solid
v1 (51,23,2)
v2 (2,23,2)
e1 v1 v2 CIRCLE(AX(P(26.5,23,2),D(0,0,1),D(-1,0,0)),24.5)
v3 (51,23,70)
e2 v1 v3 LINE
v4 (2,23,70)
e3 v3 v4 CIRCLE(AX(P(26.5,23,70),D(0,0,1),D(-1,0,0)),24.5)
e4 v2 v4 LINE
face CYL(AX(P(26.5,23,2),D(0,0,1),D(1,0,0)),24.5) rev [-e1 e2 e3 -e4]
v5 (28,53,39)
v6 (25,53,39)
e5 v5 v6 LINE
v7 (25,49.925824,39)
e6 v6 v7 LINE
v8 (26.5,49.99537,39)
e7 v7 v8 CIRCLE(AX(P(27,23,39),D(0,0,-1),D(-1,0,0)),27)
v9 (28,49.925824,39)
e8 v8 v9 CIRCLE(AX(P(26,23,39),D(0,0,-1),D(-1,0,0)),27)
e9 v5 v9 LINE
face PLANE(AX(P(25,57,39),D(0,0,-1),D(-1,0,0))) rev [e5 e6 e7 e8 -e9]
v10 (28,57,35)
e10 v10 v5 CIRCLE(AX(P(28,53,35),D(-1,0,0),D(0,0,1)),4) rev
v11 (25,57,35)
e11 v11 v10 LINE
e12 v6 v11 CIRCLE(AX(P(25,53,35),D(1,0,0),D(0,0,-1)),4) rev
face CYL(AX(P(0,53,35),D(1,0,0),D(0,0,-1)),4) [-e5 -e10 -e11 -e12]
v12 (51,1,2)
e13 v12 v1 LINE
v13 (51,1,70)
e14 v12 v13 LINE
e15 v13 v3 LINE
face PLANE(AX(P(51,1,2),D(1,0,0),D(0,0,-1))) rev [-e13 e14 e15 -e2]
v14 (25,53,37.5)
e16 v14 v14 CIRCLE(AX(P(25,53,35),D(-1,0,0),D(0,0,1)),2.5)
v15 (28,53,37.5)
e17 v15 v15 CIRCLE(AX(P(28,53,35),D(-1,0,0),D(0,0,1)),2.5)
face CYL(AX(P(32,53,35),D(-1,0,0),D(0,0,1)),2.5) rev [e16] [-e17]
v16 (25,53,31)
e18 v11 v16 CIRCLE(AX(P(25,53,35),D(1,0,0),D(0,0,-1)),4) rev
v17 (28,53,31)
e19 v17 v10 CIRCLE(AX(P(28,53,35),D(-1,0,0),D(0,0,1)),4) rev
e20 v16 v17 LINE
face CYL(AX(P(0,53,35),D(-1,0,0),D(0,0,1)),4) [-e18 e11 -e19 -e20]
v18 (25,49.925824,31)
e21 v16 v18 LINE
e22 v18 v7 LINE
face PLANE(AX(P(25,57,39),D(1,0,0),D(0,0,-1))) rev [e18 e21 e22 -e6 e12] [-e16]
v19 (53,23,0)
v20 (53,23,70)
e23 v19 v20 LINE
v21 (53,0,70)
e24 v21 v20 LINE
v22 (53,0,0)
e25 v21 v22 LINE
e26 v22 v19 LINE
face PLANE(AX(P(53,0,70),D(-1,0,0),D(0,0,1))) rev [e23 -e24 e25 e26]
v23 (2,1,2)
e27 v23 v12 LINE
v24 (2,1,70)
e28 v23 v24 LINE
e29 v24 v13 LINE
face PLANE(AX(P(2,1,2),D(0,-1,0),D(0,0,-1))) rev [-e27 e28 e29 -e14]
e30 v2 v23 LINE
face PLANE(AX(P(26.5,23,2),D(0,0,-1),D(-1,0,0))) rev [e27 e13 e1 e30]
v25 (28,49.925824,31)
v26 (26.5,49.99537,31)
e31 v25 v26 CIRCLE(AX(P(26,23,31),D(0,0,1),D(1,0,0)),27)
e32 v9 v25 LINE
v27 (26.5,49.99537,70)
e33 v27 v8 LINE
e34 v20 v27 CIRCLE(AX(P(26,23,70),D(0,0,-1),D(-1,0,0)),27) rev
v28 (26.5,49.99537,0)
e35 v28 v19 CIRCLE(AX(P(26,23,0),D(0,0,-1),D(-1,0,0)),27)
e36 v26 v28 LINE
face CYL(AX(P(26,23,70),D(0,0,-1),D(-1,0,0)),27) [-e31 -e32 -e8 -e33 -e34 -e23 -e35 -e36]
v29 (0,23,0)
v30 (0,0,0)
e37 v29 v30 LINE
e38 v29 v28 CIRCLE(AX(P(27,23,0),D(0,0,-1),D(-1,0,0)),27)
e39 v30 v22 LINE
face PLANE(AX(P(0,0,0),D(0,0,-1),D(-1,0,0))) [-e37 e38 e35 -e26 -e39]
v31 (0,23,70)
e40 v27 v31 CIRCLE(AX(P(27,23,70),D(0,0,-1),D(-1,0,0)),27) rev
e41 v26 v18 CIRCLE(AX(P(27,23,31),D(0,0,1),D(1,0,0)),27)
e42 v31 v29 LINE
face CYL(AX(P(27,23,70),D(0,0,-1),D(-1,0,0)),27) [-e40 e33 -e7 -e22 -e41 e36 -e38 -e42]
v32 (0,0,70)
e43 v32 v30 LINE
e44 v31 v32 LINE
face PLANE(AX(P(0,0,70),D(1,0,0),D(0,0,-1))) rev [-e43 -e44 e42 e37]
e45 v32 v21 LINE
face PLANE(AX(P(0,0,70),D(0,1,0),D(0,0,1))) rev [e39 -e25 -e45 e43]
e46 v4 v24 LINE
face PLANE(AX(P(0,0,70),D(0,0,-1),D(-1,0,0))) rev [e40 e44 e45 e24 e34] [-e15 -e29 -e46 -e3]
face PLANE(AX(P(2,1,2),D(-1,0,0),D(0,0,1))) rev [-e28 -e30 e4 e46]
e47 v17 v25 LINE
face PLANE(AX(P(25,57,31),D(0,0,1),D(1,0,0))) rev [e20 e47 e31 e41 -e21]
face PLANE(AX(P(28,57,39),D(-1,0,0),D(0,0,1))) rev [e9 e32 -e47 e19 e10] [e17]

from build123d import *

# Parameters (mm, degrees)
ESQUISSE1_W             = 53
ESQUISSE1_H             = 50
BOSS_EXTRU_1_DEPTH      = 70
ESQUISSE5_W             = 3
ESQUISSE5_H             = 8
BOSS_EXTRU_2_DEPTH      = 7
CONG_1_R                = 4
CONG_2_R                = 27
ESQUISSE8_R             = 2.5
ENL_V_MAT_EXTRU_3_DEPTH = 7
ENL_V_MAT_EXTRU_4_DEPTH = 68


# Some blends are built 0.0001 mm under size
with BuildPart() as part:
    # Esquisse1 → Boss.-Extru.1 (new body)
    with BuildSketch(Plane.XY):
        with Locations((26.5, 25)):
            Rectangle(ESQUISSE1_W, ESQUISSE1_H)
    extrude(amount=BOSS_EXTRU_1_DEPTH)

    # Esquisse5 → Boss.-Extru.2 (add)
    with BuildSketch(Plane(origin=(0, 50, 0), x_dir=(1, 0, 0), z_dir=(0, 1, 0))):
        with Locations((26.5, -35)):
            Rectangle(ESQUISSE5_W, ESQUISSE5_H)
    extrude(amount=BOSS_EXTRU_2_DEPTH)

    # Congé1
    cong_1_edges = [part.edges().sort_by_distance(p)[0] for p in [
        (26.5, 57, 31),
        (26.5, 57, 39),
    ]]
    fillet(cong_1_edges, radius=CONG_1_R - 0.0001)  # a hair under: the kernel refuses the full size

    # Congé2
    # the kernel refuses this fillet: 27 mm, written as the material it takes off along each edge
    with BuildSketch(Plane(origin=(0, 50, -67.5), x_dir=(1, 0, 0), z_dir=(0, 0, 1))) as cong_2_piece_1_section:
        with BuildLine():
            CenterArc((CONG_2_R, -CONG_2_R), CONG_2_R, 90, 90)
            Line((0, -CONG_2_R), (0, 0))
            Line((0, 0), (CONG_2_R, 0))
        make_face()
    cong_2_piece_1 = extrude(amount=205, mode=Mode.PRIVATE)
    cong_2_piece_1 = split(cong_2_piece_1, bisect_by=Plane(origin=(25, 50.257211281, -18.25), z_dir=(1, 0, 0)), keep=Keep.TOP, mode=Mode.PRIVATE)
    cong_2_piece_1 = split(cong_2_piece_1, bisect_by=Plane(origin=(25.978114042, 50.257211281, 31), z_dir=(0, 0, -1)), keep=Keep.TOP, mode=Mode.PRIVATE)
    add(cong_2_piece_1, mode=Mode.SUBTRACT)
    with BuildSketch(Plane(origin=(0, 50, -67.5), x_dir=(1, 0, 0), z_dir=(0, 0, 1))) as cong_2_piece_2_section:
        with BuildLine():
            CenterArc((CONG_2_R, -CONG_2_R), CONG_2_R, 90, 90)
            Line((0, -CONG_2_R), (0, 0))
            Line((0, 0), (CONG_2_R, 0))
        make_face()
    cong_2_piece_2 = extrude(amount=205, mode=Mode.PRIVATE)
    cong_2_piece_2 = split(cong_2_piece_2, bisect_by=Plane(origin=(25, 43.848394797, -18.25), z_dir=(-1, 0, 0)), keep=Keep.TOP, mode=Mode.PRIVATE)
    cong_2_piece_2 = split(cong_2_piece_2, bisect_by=Plane(origin=(5.991236712, 43.848394797, 31), z_dir=(0, 0, -1)), keep=Keep.TOP, mode=Mode.PRIVATE)
    add(cong_2_piece_2, mode=Mode.SUBTRACT)
    with BuildSketch(Plane(origin=(0, 50, -67.5), x_dir=(1, 0, 0), z_dir=(0, 0, 1))) as cong_2_piece_3_section:
        with BuildLine():
            CenterArc((CONG_2_R, -CONG_2_R), CONG_2_R, 90, 90)
            Line((0, -CONG_2_R), (0, 0))
            Line((0, 0), (CONG_2_R, 0))
        make_face()
    cong_2_piece_3 = extrude(amount=205, mode=Mode.PRIVATE)
    cong_2_piece_3 = split(cong_2_piece_3, bisect_by=Plane(origin=(25, 43.848394797, 35), z_dir=(-1, 0, 0)), keep=Keep.TOP, mode=Mode.PRIVATE)
    cong_2_piece_3 = split(cong_2_piece_3, bisect_by=Plane(origin=(5.991236712, 43.848394797, 31), z_dir=(0, 0, 1)), keep=Keep.TOP, mode=Mode.PRIVATE)
    cong_2_piece_3 = split(cong_2_piece_3, bisect_by=Plane(origin=(5.991236712, 43.848394797, 39), z_dir=(0, 0, -1)), keep=Keep.TOP, mode=Mode.PRIVATE)
    add(cong_2_piece_3, mode=Mode.SUBTRACT)
    with BuildSketch(Plane(origin=(0, 50, -67.5), x_dir=(1, 0, 0), z_dir=(0, 0, 1))) as cong_2_piece_4_section:
        with BuildLine():
            CenterArc((CONG_2_R, -CONG_2_R), CONG_2_R, 90, 90)
            Line((0, -CONG_2_R), (0, 0))
            Line((0, 0), (CONG_2_R, 0))
        make_face()
    cong_2_piece_4 = extrude(amount=205, mode=Mode.PRIVATE)
    cong_2_piece_4 = split(cong_2_piece_4, bisect_by=Plane(origin=(25, 50.257211281, 88.25), z_dir=(1, 0, 0)), keep=Keep.TOP, mode=Mode.PRIVATE)
    cong_2_piece_4 = split(cong_2_piece_4, bisect_by=Plane(origin=(25.978114042, 50.257211281, 39), z_dir=(0, 0, 1)), keep=Keep.TOP, mode=Mode.PRIVATE)
    add(cong_2_piece_4, mode=Mode.SUBTRACT)
    with BuildSketch(Plane(origin=(0, 50, -67.5), x_dir=(1, 0, 0), z_dir=(0, 0, 1))) as cong_2_piece_5_section:
        with BuildLine():
            CenterArc((CONG_2_R, -CONG_2_R), CONG_2_R, 90, 90)
            Line((0, -CONG_2_R), (0, 0))
            Line((0, 0), (CONG_2_R, 0))
        make_face()
    cong_2_piece_5 = extrude(amount=205, mode=Mode.PRIVATE)
    cong_2_piece_5 = split(cong_2_piece_5, bisect_by=Plane(origin=(25, 43.848394797, 88.25), z_dir=(-1, 0, 0)), keep=Keep.TOP, mode=Mode.PRIVATE)
    cong_2_piece_5 = split(cong_2_piece_5, bisect_by=Plane(origin=(5.991236712, 43.848394797, 39), z_dir=(0, 0, 1)), keep=Keep.TOP, mode=Mode.PRIVATE)
    add(cong_2_piece_5, mode=Mode.SUBTRACT)
    with BuildSketch(Plane(origin=(53, 50, -67.5), x_dir=(-1, 0, 0), z_dir=(0, 0, 1))) as cong_2_piece_6_section:
        with BuildLine():
            CenterArc((CONG_2_R, CONG_2_R), CONG_2_R, 180, 90)
            Line((0, CONG_2_R), (0, 0))
            Line((0, 0), (CONG_2_R, 0))
        make_face()
    cong_2_piece_6 = extrude(amount=205, mode=Mode.PRIVATE)
    cong_2_piece_6 = split(cong_2_piece_6, bisect_by=Plane(origin=(27.021885958, 50.257211281, 31), z_dir=(0, 0, -1)), keep=Keep.TOP, mode=Mode.PRIVATE)
    cong_2_piece_6 = split(cong_2_piece_6, bisect_by=Plane(origin=(28, 50.257211281, -18.25), z_dir=(-1, 0, 0)), keep=Keep.TOP, mode=Mode.PRIVATE)
    add(cong_2_piece_6, mode=Mode.SUBTRACT)
    with BuildSketch(Plane(origin=(53, 50, -67.5), x_dir=(-1, 0, 0), z_dir=(0, 0, 1))) as cong_2_piece_7_section:
        with BuildLine():
            CenterArc((CONG_2_R, CONG_2_R), CONG_2_R, 180, 90)
            Line((0, CONG_2_R), (0, 0))
            Line((0, 0), (CONG_2_R, 0))
        make_face()
    cong_2_piece_7 = extrude(amount=205, mode=Mode.PRIVATE)
    cong_2_piece_7 = split(cong_2_piece_7, bisect_by=Plane(origin=(47.008763288, 43.848394797, 31), z_dir=(0, 0, -1)), keep=Keep.TOP, mode=Mode.PRIVATE)
    cong_2_piece_7 = split(cong_2_piece_7, bisect_by=Plane(origin=(28, 43.848394797, -18.25), z_dir=(1, 0, 0)), keep=Keep.TOP, mode=Mode.PRIVATE)
    add(cong_2_piece_7, mode=Mode.SUBTRACT)
    with BuildSketch(Plane(origin=(53, 50, -67.5), x_dir=(-1, 0, 0), z_dir=(0, 0, 1))) as cong_2_piece_8_section:
        with BuildLine():
            CenterArc((CONG_2_R, CONG_2_R), CONG_2_R, 180, 90)
            Line((0, CONG_2_R), (0, 0))
            Line((0, 0), (CONG_2_R, 0))
        make_face()
    cong_2_piece_8 = extrude(amount=205, mode=Mode.PRIVATE)
    cong_2_piece_8 = split(cong_2_piece_8, bisect_by=Plane(origin=(47.008763288, 43.848394797, 31), z_dir=(0, 0, 1)), keep=Keep.TOP, mode=Mode.PRIVATE)
    cong_2_piece_8 = split(cong_2_piece_8, bisect_by=Plane(origin=(28, 43.848394797, 35), z_dir=(1, 0, 0)), keep=Keep.TOP, mode=Mode.PRIVATE)
    cong_2_piece_8 = split(cong_2_piece_8, bisect_by=Plane(origin=(47.008763288, 43.848394797, 39), z_dir=(0, 0, -1)), keep=Keep.TOP, mode=Mode.PRIVATE)
    add(cong_2_piece_8, mode=Mode.SUBTRACT)
    with BuildSketch(Plane(origin=(53, 50, -67.5), x_dir=(-1, 0, 0), z_dir=(0, 0, 1))) as cong_2_piece_9_section:
        with BuildLine():
            CenterArc((CONG_2_R, CONG_2_R), CONG_2_R, 180, 90)
            Line((0, CONG_2_R), (0, 0))
            Line((0, 0), (CONG_2_R, 0))
        make_face()
    cong_2_piece_9 = extrude(amount=205, mode=Mode.PRIVATE)
    cong_2_piece_9 = split(cong_2_piece_9, bisect_by=Plane(origin=(28, 50.257211281, 88.25), z_dir=(-1, 0, 0)), keep=Keep.TOP, mode=Mode.PRIVATE)
    cong_2_piece_9 = split(cong_2_piece_9, bisect_by=Plane(origin=(27.021885958, 50.257211281, 39), z_dir=(0, 0, 1)), keep=Keep.TOP, mode=Mode.PRIVATE)
    add(cong_2_piece_9, mode=Mode.SUBTRACT)
    with BuildSketch(Plane(origin=(53, 50, -67.5), x_dir=(-1, 0, 0), z_dir=(0, 0, 1))) as cong_2_piece_10_section:
        with BuildLine():
            CenterArc((CONG_2_R, CONG_2_R), CONG_2_R, 180, 90)
            Line((0, CONG_2_R), (0, 0))
            Line((0, 0), (CONG_2_R, 0))
        make_face()
    cong_2_piece_10 = extrude(amount=205, mode=Mode.PRIVATE)
    cong_2_piece_10 = split(cong_2_piece_10, bisect_by=Plane(origin=(28, 43.848394797, 88.25), z_dir=(1, 0, 0)), keep=Keep.TOP, mode=Mode.PRIVATE)
    cong_2_piece_10 = split(cong_2_piece_10, bisect_by=Plane(origin=(47.008763288, 43.848394797, 39), z_dir=(0, 0, 1)), keep=Keep.TOP, mode=Mode.PRIVATE)
    add(cong_2_piece_10, mode=Mode.SUBTRACT)

    # Esquisse8 → Enlèv. mat.-Extru.3 (cut)
    with BuildSketch(Plane.ZY.offset(-25)):
        with Locations((35, 53)):
            Circle(ESQUISSE8_R)
    extrude(amount=-ENL_V_MAT_EXTRU_3_DEPTH, mode=Mode.SUBTRACT)

    # Esquisse9 → Enlèv. mat.-Extru.4 (cut)
    with BuildSketch(Plane.XY.offset(70)):
        with BuildLine():
            Line((2, 1), (51, 1))
            Line((51, 1), (51, 23))
            ThreePointArc((51, 23), (43.829843545, 40.318386839), (26.516202227, 47.499994643))
            ThreePointArc((26.516202227, 47.499994643), (9.181613161, 40.329843545), (2, 23))
            Line((2, 23), (2, 1))
        make_face()
    extrude(amount=-ENL_V_MAT_EXTRU_4_DEPTH, mode=Mode.SUBTRACT)


solid = part.part
